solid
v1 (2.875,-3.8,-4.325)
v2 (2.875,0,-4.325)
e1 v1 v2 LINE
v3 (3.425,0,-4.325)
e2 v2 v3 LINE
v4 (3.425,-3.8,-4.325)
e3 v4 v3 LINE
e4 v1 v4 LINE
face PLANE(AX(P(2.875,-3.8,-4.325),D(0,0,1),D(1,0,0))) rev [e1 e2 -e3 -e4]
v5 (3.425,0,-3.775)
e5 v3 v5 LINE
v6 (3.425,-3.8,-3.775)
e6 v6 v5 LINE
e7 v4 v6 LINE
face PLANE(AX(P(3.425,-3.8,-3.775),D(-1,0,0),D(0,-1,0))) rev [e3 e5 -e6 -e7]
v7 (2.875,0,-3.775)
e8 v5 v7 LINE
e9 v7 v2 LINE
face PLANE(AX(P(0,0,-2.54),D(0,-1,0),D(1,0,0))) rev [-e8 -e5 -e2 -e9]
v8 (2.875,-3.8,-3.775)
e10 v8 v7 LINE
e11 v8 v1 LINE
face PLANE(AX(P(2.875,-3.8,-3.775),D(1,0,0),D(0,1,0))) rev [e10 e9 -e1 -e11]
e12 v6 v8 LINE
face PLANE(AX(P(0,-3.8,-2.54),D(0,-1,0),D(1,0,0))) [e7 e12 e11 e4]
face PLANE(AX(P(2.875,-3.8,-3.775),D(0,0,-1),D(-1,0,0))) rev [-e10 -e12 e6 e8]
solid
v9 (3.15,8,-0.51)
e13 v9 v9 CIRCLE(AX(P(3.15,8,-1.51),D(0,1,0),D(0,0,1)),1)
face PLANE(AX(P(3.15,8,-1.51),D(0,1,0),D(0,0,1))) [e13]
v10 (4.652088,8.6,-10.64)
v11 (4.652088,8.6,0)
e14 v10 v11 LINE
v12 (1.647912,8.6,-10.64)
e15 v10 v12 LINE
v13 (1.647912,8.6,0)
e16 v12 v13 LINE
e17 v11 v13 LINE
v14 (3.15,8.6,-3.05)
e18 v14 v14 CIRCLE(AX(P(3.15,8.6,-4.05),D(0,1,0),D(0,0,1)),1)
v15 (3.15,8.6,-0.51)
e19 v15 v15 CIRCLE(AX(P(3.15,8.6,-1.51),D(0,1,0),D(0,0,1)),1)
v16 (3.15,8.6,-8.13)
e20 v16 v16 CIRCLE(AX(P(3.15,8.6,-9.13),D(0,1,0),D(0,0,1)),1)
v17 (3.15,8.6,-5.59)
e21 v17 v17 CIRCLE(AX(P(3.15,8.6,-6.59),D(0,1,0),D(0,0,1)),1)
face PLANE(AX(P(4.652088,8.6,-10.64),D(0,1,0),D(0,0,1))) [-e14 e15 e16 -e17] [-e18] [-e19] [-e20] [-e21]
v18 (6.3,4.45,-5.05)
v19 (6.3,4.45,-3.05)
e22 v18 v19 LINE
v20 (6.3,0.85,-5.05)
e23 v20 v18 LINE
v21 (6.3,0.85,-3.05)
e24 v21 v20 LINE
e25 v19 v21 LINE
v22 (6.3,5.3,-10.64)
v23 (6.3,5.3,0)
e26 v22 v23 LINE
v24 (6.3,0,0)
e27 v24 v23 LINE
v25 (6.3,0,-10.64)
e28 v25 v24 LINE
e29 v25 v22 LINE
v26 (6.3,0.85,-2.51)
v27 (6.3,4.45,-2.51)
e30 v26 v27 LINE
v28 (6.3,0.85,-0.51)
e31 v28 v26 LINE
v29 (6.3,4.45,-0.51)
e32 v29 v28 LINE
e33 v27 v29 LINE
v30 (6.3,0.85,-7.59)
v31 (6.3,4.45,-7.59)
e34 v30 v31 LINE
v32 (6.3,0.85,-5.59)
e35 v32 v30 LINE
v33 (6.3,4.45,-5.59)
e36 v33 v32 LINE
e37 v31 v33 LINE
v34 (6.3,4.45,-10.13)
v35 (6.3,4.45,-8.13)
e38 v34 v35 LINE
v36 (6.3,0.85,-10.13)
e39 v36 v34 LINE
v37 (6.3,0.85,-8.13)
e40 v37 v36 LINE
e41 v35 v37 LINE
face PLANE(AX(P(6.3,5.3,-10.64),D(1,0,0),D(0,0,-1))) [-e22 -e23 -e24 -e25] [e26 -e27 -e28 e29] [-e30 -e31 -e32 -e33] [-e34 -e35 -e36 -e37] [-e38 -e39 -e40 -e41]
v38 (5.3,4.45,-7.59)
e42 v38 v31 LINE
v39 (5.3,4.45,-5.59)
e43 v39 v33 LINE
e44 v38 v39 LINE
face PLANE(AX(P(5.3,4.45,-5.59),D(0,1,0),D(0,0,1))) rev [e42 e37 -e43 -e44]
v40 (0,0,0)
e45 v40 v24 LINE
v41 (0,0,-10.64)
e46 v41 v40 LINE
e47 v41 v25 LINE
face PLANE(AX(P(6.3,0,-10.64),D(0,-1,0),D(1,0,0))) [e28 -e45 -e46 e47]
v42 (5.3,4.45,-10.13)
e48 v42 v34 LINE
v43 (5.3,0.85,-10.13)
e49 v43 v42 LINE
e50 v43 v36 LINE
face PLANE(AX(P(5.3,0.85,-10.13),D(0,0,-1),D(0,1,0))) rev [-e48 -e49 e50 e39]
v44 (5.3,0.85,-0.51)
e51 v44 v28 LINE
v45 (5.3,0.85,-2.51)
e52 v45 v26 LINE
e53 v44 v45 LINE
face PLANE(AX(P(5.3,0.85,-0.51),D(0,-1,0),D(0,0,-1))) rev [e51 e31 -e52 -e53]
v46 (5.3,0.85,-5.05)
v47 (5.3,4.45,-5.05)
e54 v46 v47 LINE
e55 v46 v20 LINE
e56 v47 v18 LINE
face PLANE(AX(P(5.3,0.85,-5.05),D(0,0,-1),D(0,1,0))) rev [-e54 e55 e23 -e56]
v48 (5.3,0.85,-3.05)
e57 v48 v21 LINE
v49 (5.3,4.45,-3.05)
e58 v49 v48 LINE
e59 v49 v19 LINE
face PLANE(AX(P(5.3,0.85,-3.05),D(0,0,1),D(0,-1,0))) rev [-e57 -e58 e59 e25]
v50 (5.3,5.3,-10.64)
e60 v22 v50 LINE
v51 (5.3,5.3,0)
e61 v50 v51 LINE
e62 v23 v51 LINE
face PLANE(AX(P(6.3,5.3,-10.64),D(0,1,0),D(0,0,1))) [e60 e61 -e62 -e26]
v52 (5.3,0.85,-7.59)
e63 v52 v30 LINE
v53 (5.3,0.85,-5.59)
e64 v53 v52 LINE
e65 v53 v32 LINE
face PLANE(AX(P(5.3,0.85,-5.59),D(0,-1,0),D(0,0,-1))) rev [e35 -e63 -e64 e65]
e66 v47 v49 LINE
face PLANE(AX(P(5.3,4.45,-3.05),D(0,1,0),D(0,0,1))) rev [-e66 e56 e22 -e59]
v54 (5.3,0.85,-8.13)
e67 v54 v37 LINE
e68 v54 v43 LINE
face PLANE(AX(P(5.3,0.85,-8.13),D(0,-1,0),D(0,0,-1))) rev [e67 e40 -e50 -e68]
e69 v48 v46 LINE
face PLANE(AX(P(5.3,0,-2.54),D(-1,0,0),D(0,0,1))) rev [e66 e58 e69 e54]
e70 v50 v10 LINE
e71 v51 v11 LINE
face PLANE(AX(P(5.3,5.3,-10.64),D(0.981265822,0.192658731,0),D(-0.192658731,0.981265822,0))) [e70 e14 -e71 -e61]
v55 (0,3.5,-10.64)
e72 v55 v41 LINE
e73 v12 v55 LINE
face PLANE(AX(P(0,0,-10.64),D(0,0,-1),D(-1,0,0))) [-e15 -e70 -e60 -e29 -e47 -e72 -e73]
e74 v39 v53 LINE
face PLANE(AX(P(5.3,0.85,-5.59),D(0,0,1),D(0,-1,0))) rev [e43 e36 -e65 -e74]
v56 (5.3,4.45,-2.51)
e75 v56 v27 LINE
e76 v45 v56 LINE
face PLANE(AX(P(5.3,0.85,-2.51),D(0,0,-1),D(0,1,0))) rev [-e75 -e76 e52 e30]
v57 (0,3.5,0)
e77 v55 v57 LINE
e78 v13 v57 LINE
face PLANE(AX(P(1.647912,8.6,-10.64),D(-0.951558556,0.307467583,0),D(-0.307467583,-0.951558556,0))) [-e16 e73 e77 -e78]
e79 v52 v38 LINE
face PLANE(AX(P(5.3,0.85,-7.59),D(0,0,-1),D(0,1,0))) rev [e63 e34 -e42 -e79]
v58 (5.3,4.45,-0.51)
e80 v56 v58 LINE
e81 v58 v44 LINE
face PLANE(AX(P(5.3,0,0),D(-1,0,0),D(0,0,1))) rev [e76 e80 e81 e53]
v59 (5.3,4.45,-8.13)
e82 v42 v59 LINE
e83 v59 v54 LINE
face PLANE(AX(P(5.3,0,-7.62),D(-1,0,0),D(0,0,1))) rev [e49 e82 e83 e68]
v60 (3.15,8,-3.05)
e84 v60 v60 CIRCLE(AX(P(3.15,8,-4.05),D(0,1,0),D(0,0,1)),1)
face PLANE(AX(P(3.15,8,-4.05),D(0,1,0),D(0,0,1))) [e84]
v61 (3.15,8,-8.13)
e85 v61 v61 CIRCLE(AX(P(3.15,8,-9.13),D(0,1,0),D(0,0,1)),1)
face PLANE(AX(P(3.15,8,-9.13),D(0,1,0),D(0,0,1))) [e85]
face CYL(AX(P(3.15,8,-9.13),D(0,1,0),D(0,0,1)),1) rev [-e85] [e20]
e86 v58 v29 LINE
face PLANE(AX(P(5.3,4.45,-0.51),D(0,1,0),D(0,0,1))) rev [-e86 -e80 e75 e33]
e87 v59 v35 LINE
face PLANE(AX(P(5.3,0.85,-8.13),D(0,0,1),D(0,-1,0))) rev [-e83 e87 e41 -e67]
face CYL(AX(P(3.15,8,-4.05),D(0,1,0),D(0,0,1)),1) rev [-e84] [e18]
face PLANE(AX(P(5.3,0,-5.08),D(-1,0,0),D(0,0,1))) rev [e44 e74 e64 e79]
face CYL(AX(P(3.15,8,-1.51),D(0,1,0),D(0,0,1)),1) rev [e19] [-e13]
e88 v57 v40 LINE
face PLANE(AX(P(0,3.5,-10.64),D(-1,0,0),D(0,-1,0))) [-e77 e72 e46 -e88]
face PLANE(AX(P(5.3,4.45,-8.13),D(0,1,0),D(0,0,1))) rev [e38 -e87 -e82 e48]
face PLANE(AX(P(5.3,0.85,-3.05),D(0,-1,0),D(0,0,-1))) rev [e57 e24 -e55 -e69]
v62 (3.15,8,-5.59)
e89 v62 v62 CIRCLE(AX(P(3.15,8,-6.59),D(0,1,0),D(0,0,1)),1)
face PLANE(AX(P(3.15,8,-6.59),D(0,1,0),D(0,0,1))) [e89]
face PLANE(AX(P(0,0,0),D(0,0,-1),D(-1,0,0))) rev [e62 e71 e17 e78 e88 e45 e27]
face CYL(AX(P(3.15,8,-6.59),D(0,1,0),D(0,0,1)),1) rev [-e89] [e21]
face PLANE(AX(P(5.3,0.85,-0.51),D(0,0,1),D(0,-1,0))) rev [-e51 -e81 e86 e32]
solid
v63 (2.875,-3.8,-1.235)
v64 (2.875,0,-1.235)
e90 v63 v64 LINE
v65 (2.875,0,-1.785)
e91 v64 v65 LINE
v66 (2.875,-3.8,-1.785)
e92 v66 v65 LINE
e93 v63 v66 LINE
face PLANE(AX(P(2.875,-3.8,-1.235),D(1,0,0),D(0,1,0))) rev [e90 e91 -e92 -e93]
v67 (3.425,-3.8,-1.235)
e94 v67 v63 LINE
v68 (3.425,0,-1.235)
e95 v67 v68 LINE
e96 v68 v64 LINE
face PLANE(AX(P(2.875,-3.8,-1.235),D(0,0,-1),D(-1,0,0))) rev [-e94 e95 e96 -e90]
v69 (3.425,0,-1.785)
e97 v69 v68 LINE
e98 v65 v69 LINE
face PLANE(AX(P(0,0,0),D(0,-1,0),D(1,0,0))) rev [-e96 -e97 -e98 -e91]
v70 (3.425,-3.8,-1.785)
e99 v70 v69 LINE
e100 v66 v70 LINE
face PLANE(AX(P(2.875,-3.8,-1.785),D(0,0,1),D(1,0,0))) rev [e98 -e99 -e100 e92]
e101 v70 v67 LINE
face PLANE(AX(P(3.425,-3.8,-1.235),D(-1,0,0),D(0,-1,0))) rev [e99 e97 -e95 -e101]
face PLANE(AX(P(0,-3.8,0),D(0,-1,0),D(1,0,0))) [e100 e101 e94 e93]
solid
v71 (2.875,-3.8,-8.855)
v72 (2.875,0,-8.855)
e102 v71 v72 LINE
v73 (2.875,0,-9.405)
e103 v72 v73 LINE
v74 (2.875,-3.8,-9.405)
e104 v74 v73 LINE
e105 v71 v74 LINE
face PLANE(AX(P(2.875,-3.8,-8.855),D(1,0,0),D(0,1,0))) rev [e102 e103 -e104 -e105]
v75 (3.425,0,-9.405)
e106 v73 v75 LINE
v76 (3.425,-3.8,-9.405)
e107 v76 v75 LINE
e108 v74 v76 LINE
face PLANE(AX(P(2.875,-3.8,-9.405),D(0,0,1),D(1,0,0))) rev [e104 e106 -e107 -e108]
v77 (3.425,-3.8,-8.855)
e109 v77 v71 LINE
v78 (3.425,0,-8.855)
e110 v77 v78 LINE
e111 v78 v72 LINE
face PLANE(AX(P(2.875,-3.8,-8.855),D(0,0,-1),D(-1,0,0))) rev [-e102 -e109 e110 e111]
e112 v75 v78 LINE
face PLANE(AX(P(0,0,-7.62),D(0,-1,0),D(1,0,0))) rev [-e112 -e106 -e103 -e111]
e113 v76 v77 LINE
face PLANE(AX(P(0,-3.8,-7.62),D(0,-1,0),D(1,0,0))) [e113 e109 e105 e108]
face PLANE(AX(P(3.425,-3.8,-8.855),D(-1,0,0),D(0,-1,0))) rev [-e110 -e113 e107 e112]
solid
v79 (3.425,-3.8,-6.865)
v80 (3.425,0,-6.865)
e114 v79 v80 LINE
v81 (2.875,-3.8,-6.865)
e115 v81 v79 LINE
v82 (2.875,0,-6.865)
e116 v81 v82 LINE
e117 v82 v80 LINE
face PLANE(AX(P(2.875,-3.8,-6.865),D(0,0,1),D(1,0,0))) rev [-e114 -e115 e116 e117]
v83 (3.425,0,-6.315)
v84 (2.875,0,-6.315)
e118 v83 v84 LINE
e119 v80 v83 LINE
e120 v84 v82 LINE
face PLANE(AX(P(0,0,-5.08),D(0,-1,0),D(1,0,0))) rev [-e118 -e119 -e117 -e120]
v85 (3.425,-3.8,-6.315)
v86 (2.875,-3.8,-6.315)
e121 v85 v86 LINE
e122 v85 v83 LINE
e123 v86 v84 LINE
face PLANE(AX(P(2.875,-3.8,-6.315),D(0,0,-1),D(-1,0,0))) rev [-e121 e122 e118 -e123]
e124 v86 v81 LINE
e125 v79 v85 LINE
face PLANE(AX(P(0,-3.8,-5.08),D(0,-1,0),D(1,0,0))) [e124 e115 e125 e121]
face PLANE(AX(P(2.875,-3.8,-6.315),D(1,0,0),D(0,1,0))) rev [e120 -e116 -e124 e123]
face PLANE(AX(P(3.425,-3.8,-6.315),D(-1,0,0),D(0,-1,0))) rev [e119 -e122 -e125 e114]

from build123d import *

# Parameters (mm, degrees)
BOSS_EXTRUDE1_DEPTH   = 10.64
SKETCH3_R             = 1
CUT_EXTRUDE1_DEPTH    = 0.6
SKETCH4_W             = 2
SKETCH4_H             = 3.6
CUT_EXTRUDE2_DEPTH    = 1
SKETCH5_W             = 0.55
SKETCH5_H             = 0.55
BOSS_EXTRUDE2_DEPTH   = 3.8
LPATTERN1_START       = 2.875
LPATTERN1_OUTLINE_W   = 3.8
LPATTERN1_OUTLINE_H   = 0.55
LPATTERN1_DEPTH       = 0.55
LPATTERN1_2_OUTLINE_W = 3.8
LPATTERN1_2_OUTLINE_H = 0.55
LPATTERN1_2_DEPTH     = 0.55
LPATTERN1_3_OUTLINE_W = 3.8
LPATTERN1_3_OUTLINE_H = 0.55
LPATTERN1_3_DEPTH     = 0.55
LPATTERN1_START_2     = 0.85
LPATTERN1_4_OUTLINE_W = 1
LPATTERN1_4_OUTLINE_H = 2
LPATTERN1_4_DEPTH     = 3.6
LPATTERN1_START_3     = 8
LPATTERN1_5_OUTLINE_R = 1
LPATTERN1_5_DEPTH     = 0.6


# Read off the part's stored shape, not the designer's step: LPattern1
with BuildPart() as part:
    # Sketch2 → Boss-Extrude1 (new body)
    with BuildSketch(Plane.XY):
        Polygon((6.3, 5.3), (5.3, 5.3), (4.652088092, 8.6), (1.647911908, 8.6), (0, 3.5), (0, 0), (6.3, 0), align=None)
    extrude(amount=-BOSS_EXTRUDE1_DEPTH)

    # Sketch3 → Cut-Extrude1 (cut)
    with BuildSketch(Plane(origin=(0, 8.6, 0), x_dir=(1, 0, 0), z_dir=(0, 1, 0))):
        with Locations(Location((3.15, 1.51, 0), (0, 0, 270))):
            Circle(SKETCH3_R)
    extrude(amount=-CUT_EXTRUDE1_DEPTH, mode=Mode.SUBTRACT)

    # Sketch4 → Cut-Extrude2 (cut)
    with BuildSketch(Plane(origin=(6.3, 0, 0), x_dir=(0, 0, -1), z_dir=(1, 0, 0))):
        with Locations((1.51, 2.65)):
            Rectangle(SKETCH4_W, SKETCH4_H)
    extrude(amount=-CUT_EXTRUDE2_DEPTH, mode=Mode.SUBTRACT)

    # LPattern1 4 outline → LPattern1 4 (cut)
    with BuildSketch(Plane(origin=(0, 0, 0), x_dir=(1, 0, 0), z_dir=(0, 1, 0)).offset(LPATTERN1_START_2)):
        with Locations((5.8, 9.13)):
            Rectangle(LPATTERN1_4_OUTLINE_W, LPATTERN1_4_OUTLINE_H)
        with Locations((5.8, 4.05)):
            Rectangle(LPATTERN1_4_OUTLINE_W, LPATTERN1_4_OUTLINE_H)
        with Locations((5.8, 6.59)):
            Rectangle(LPATTERN1_4_OUTLINE_W, LPATTERN1_4_OUTLINE_H)
    extrude(amount=LPATTERN1_4_DEPTH, mode=Mode.SUBTRACT)

    # LPattern1 5 outline → LPattern1 5 (cut)
    with BuildSketch(Plane(origin=(0, 0, 0), x_dir=(1, 0, 0), z_dir=(0, 1, 0)).offset(LPATTERN1_START_3)):
        with Locations((3.15, 9.13)):
            Circle(LPATTERN1_5_OUTLINE_R)
        with Locations((3.15, 6.59)):
            Circle(LPATTERN1_5_OUTLINE_R)
        with Locations((3.15, 4.05)):
            Circle(LPATTERN1_5_OUTLINE_R)
    extrude(amount=LPATTERN1_5_DEPTH, mode=Mode.SUBTRACT)


with BuildPart() as body_2:
    # Sketch5 → Boss-Extrude2 (new body)
    with BuildSketch(Plane.XZ):
        with Locations((3.15, -1.51)):
            Rectangle(SKETCH5_W, SKETCH5_H)
    extrude(amount=BOSS_EXTRUDE2_DEPTH)


with BuildPart() as body_3:
    # LPattern1 outline → LPattern1 (new body)
    with BuildSketch(Plane.YZ.offset(LPATTERN1_START)):
        with Locations((-1.9, -9.13)):
            Rectangle(LPATTERN1_OUTLINE_W, LPATTERN1_OUTLINE_H)
    extrude(amount=LPATTERN1_DEPTH)


with BuildPart() as body_4:
    # LPattern1 2 outline → LPattern1 2 (new body)
    with BuildSketch(Plane.YZ.offset(LPATTERN1_START)):
        with Locations((-1.9, -6.59)):
            Rectangle(LPATTERN1_2_OUTLINE_W, LPATTERN1_2_OUTLINE_H)
    extrude(amount=LPATTERN1_2_DEPTH)


with BuildPart() as body_5:
    # LPattern1 3 outline → LPattern1 3 (new body)
    with BuildSketch(Plane.YZ.offset(LPATTERN1_START)):
        with Locations((-1.9, -4.05)):
            Rectangle(LPATTERN1_3_OUTLINE_W, LPATTERN1_3_OUTLINE_H)
    extrude(amount=LPATTERN1_3_DEPTH)


solid = Compound([part.part, body_2.part, body_3.part, body_4.part, body_5.part])
